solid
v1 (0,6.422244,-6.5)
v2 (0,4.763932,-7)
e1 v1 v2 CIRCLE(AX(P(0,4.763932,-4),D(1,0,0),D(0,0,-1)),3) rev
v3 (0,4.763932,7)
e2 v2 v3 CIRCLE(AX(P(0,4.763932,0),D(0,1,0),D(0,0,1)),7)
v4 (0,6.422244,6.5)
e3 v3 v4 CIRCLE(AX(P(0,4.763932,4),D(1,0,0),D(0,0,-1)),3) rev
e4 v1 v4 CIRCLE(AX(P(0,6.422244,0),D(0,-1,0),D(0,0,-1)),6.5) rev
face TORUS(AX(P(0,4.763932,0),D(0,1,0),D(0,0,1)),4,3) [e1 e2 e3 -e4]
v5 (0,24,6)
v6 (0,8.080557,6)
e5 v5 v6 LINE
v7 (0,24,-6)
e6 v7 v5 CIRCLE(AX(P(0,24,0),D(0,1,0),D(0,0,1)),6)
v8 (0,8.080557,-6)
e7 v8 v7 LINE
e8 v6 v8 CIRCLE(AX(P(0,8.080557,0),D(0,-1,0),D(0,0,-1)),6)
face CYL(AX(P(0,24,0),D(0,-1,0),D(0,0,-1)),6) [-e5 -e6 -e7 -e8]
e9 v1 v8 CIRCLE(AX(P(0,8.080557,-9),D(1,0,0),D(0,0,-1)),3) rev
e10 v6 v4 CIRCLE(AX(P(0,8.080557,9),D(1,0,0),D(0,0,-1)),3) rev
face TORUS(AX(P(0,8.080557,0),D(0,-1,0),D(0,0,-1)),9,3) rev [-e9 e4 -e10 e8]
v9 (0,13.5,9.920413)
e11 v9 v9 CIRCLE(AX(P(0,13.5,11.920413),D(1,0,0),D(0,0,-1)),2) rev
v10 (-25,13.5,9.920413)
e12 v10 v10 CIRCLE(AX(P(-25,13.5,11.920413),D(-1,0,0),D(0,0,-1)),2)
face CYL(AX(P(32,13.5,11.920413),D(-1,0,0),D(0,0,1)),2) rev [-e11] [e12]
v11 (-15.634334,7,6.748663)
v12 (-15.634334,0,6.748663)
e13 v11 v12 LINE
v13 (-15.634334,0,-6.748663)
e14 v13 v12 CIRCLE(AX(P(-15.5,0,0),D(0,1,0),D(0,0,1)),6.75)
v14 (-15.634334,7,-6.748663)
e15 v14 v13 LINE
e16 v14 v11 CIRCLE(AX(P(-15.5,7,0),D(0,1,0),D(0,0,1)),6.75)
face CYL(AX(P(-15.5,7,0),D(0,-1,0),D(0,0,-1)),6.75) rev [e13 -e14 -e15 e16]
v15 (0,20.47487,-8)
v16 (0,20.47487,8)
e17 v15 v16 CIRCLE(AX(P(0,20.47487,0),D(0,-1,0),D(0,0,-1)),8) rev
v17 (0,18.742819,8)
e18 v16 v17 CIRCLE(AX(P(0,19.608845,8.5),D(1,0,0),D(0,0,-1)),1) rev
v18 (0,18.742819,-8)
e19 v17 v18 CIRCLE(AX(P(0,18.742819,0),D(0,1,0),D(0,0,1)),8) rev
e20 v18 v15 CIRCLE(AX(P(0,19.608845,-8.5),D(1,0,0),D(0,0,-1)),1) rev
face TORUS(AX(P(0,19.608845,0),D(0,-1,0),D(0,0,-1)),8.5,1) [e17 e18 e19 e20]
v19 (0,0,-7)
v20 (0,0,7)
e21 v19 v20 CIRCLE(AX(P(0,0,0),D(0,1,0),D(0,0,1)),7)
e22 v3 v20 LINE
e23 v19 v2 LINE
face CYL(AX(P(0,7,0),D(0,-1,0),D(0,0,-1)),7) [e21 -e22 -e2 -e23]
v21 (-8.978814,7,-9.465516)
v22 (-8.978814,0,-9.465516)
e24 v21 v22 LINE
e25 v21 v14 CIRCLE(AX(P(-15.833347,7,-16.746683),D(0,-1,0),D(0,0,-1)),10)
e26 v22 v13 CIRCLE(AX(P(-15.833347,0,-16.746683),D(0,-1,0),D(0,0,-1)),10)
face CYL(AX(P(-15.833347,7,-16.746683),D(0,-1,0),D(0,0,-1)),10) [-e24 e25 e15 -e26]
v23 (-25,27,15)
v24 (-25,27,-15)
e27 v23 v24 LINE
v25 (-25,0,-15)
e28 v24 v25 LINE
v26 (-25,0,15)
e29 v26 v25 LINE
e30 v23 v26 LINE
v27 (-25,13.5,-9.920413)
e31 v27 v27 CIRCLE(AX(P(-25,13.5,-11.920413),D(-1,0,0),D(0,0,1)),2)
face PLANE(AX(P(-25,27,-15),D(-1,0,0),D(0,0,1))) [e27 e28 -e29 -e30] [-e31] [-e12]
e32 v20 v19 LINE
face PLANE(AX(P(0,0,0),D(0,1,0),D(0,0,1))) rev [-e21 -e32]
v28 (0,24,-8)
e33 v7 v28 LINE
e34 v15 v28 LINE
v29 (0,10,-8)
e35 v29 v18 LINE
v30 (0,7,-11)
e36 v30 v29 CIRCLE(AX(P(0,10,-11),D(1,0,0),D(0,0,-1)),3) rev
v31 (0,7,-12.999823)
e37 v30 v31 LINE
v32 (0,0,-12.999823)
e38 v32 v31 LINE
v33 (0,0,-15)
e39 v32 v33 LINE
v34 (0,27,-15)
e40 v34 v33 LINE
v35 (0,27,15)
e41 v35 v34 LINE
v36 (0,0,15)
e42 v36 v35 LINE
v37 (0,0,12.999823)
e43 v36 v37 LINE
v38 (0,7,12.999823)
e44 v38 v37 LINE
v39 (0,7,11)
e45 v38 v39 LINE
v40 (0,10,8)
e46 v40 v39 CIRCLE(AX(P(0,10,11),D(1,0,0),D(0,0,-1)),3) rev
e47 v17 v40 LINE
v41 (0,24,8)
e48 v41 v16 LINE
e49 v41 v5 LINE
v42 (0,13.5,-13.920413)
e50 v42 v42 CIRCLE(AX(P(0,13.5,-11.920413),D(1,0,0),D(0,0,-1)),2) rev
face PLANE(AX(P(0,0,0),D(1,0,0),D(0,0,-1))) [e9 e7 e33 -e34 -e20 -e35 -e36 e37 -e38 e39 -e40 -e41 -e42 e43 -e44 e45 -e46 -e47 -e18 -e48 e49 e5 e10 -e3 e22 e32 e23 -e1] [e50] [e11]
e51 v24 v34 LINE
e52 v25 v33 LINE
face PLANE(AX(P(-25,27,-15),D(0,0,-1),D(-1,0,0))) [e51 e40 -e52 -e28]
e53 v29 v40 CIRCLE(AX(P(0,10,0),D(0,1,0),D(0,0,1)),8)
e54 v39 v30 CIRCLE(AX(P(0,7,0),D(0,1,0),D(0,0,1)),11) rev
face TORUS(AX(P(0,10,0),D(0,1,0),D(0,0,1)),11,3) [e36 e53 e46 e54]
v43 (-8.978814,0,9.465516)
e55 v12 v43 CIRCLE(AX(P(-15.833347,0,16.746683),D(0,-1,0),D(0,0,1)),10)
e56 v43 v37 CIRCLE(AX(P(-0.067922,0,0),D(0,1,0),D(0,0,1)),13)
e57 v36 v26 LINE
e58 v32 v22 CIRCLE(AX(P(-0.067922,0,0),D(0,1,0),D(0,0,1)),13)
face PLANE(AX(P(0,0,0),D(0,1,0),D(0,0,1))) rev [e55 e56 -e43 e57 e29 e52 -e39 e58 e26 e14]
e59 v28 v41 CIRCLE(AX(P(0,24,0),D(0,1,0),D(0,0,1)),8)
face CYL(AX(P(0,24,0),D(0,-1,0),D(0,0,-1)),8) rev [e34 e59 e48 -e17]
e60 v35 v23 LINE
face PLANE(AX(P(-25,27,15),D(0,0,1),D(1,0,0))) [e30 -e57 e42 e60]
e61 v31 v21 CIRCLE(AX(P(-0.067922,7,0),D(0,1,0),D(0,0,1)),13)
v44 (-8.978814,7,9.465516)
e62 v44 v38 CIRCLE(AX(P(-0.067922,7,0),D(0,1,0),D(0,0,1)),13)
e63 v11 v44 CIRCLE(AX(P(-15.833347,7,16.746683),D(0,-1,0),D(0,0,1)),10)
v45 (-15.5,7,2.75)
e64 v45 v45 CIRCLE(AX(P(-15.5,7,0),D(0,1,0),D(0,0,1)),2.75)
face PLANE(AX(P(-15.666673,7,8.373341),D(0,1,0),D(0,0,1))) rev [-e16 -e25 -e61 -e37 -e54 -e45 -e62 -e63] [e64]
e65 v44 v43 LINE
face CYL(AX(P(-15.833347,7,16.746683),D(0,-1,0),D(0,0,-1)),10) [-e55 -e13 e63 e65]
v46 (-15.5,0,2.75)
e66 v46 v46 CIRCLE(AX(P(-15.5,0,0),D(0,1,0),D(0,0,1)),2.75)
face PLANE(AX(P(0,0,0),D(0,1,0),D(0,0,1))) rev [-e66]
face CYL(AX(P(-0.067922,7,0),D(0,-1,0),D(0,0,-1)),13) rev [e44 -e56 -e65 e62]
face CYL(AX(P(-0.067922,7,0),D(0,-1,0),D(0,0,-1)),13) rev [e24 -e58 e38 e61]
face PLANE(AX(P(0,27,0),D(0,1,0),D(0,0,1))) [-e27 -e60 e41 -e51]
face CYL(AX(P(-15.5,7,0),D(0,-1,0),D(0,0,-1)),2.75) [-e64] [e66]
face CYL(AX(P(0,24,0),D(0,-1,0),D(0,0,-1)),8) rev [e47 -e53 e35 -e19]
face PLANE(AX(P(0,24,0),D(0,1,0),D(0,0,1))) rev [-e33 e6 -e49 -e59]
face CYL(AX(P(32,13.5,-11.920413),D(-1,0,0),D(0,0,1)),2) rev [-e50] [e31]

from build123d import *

# Parameters (mm, degrees)
SKETCH1_R            = 7
SKETCH1_R_2          = 2.75
SKETCH1_R_3          = 3.659852489
BOSS_EXTRUDE1_DEPTH  = 7
SKETCH2_R            = 8
SKETCH2_R_2          = 6
BOSS_EXTRUDE2_DEPTH  = 17
FILLET1_R            = 3
FILLET2_R            = 3
SKETCH3_R            = 1
SKETCH5_W            = 50
SKETCH5_H            = 30
BOSS_EXTRUDE3_DEPTH  = 27
SKETCH6_R            = 2
CUT_EXTRUDE1_DEPTH   = 57
INTERSECT3_OUTLINE_W = 27
INTERSECT3_OUTLINE_H = 30
INTERSECT3_OUTLINE_R = 2
INTERSECT3_DEPTH     = 25


with BuildPart() as part:
    # Sketch1 → Boss-Extrude1 (new body)
    with BuildSketch(Plane(origin=(0, 0, 0), x_dir=(1, 0, 0), z_dir=(0, 1, 0))):
        with BuildLine():
            ThreePointArc((-15.634333704, 6.748663161), (-22.25, 0), (-15.634333704, -6.748663161))
            ThreePointArc((-15.634333704, -6.748663161), (-12.054001616, -7.488359295), (-8.978814065, -9.465516285))
            ThreePointArc((-8.978814065, -9.465516285), (-0.448762307, -12.99442036), (8.273320847, -9.971141939))
            ThreePointArc((8.273320847, -9.971141939), (11.493139678, -8.165901558), (15.148520579, -7.651784261))
            ThreePointArc((15.148520579, -7.651784261), (23.159852489, 0), (15.148520579, 7.651784261))
            ThreePointArc((15.148520579, 7.651784261), (11.493139678, 8.165901558), (8.273320847, 9.971141939))
            ThreePointArc((8.273320847, 9.971141939), (-0.448762307, 12.99442036), (-8.978814065, 9.465516285))
            ThreePointArc((-8.978814065, 9.465516285), (-12.054001616, 7.488359295), (-15.634333704, 6.748663161))
        make_face()
        with Locations(Location((0, 0, 0), (0, 0, 270))):
            Circle(SKETCH1_R, mode=Mode.SUBTRACT)
        with Locations(Location((-15.5, 0, 0), (0, 0, 270))):
            Circle(SKETCH1_R_2, mode=Mode.SUBTRACT)
        with Locations(Location((15.5, 0, 0), (0, 0, 270))):
            Circle(SKETCH1_R_3, mode=Mode.SUBTRACT)
    extrude(amount=BOSS_EXTRUDE1_DEPTH)

    # Sketch2 → Boss-Extrude2 (add)
    with BuildSketch(Plane(origin=(0, 7, 0), x_dir=(1, 0, 0), z_dir=(0, 1, 0))):
        with Locations(Location((0, 0, 0), (0, 0, 270))):
            Circle(SKETCH2_R)
        with Locations(Location((0, 0, 0), (0, 0, 270))):
            Circle(SKETCH2_R_2, mode=Mode.SUBTRACT)
    extrude(amount=BOSS_EXTRUDE2_DEPTH)

    # Fillet1
    # the kernel refuses this fillet: 3 mm, written as the material it adds along each edge
    with BuildSketch(Plane(origin=(0, 7, 0), x_dir=(0, 0, 1), z_dir=(-1, 0, 0))) as fillet1_piece_1:
        with BuildLine():
            CenterArc((4, -2.236067977), FILLET1_R, 0, 48.189685104)
            Line((6, 0), (6.04, 0.04472136))
            ThreePointArc((6.04, 0.04472136), (6.5, 0.06), (7, 0.06))
            Line((7, 0.06), (7.06, 0))
            Line((7.06, 0), (7.06, -2.236067977))
            Line((7.06, -2.236067977), (7, -2.236067977))
        make_face()
    revolve(axis=Axis((0, 7, 0), (0, 1, 0)))
    with BuildSketch(Plane(origin=(0, 7, 0), x_dir=(0, 0, 1), z_dir=(-1, 0, 0))) as fillet1_piece_2:
        with BuildLine():
            CenterArc((8 + FILLET1_R, FILLET1_R), FILLET1_R, 180, 90)
            Line((8, FILLET1_R), (8 - FILLET1_R * 0.02, FILLET1_R))
            Line((8 - FILLET1_R * 0.02, FILLET1_R), (8 - FILLET1_R * 0.02, -FILLET1_R * 0.02))
            Line((8 - FILLET1_R * 0.02, -FILLET1_R * 0.02), (8 + FILLET1_R, -FILLET1_R * 0.02))
            Line((8 + FILLET1_R, -FILLET1_R * 0.02), (8 + FILLET1_R, 0))
        make_face()
    revolve(axis=Axis((0, 7, 0), (0, 1, 0)))

    # Fillet2
    fillet2_edges = [part.edges().sort_by_distance(p)[0] for p in [
        (0, 7, -6),
    ]]
    fillet(fillet2_edges, radius=FILLET2_R)


with BuildPart() as body_2:
    # Sketch3 → Revolve1 (revolve)
    with BuildSketch(Plane(origin=(0, 0, 0), x_dir=(0, 0, -1), z_dir=(1, 0, 0))):
        with Locations((8.5, 19.608844607)):
            Circle(SKETCH3_R)
    revolve(axis=Axis((0, 0, 0), (0, 1, 0)))


with BuildPart() as part_1:
    add(part.part)

    # Intersect1: read off the stored shape, not the designer's step
    # Intersect1: cut body 2
    add(body_2.part, mode=Mode.SUBTRACT)


with BuildPart() as body_2_2:
    # Sketch5 → Boss-Extrude3 (new body)
    with BuildSketch(Plane(origin=(0, 0, 0), x_dir=(-1, 0, 0), z_dir=(0, -1, 0))):
        Rectangle(SKETCH5_W, SKETCH5_H)
    extrude(amount=-BOSS_EXTRUDE3_DEPTH)

    # Sketch6 → Cut-Extrude1 (cut)
    with BuildSketch(Plane.ZY.offset(25)):
        with Locations((-11.920412871, 13.5)):
            Circle(SKETCH6_R)
        with Locations(Location((11.920412871, 13.5, 0), (0, 0, 180))):
            Circle(SKETCH6_R)
    extrude(amount=-CUT_EXTRUDE1_DEPTH, mode=Mode.SUBTRACT)

    # Intersect2: read off the stored shape, not the designer's step
    # Intersect2: cut part
    add(part_1.part, mode=Mode.SUBTRACT)

    # Intersect3: read off the stored shape, not the designer's step
    # Intersect3 outline → Intersect3 (cut)
    with BuildSketch(Plane.YZ):
        with Locations((13.5, 0)):
            Rectangle(INTERSECT3_OUTLINE_W, INTERSECT3_OUTLINE_H)
        with Locations((13.5, -11.920412871)):
            Circle(INTERSECT3_OUTLINE_R, mode=Mode.SUBTRACT)
        with Locations((13.5, 11.920412871)):
            Circle(INTERSECT3_OUTLINE_R, mode=Mode.SUBTRACT)
    extrude(amount=INTERSECT3_DEPTH, mode=Mode.SUBTRACT)


solid = body_2_2.part
